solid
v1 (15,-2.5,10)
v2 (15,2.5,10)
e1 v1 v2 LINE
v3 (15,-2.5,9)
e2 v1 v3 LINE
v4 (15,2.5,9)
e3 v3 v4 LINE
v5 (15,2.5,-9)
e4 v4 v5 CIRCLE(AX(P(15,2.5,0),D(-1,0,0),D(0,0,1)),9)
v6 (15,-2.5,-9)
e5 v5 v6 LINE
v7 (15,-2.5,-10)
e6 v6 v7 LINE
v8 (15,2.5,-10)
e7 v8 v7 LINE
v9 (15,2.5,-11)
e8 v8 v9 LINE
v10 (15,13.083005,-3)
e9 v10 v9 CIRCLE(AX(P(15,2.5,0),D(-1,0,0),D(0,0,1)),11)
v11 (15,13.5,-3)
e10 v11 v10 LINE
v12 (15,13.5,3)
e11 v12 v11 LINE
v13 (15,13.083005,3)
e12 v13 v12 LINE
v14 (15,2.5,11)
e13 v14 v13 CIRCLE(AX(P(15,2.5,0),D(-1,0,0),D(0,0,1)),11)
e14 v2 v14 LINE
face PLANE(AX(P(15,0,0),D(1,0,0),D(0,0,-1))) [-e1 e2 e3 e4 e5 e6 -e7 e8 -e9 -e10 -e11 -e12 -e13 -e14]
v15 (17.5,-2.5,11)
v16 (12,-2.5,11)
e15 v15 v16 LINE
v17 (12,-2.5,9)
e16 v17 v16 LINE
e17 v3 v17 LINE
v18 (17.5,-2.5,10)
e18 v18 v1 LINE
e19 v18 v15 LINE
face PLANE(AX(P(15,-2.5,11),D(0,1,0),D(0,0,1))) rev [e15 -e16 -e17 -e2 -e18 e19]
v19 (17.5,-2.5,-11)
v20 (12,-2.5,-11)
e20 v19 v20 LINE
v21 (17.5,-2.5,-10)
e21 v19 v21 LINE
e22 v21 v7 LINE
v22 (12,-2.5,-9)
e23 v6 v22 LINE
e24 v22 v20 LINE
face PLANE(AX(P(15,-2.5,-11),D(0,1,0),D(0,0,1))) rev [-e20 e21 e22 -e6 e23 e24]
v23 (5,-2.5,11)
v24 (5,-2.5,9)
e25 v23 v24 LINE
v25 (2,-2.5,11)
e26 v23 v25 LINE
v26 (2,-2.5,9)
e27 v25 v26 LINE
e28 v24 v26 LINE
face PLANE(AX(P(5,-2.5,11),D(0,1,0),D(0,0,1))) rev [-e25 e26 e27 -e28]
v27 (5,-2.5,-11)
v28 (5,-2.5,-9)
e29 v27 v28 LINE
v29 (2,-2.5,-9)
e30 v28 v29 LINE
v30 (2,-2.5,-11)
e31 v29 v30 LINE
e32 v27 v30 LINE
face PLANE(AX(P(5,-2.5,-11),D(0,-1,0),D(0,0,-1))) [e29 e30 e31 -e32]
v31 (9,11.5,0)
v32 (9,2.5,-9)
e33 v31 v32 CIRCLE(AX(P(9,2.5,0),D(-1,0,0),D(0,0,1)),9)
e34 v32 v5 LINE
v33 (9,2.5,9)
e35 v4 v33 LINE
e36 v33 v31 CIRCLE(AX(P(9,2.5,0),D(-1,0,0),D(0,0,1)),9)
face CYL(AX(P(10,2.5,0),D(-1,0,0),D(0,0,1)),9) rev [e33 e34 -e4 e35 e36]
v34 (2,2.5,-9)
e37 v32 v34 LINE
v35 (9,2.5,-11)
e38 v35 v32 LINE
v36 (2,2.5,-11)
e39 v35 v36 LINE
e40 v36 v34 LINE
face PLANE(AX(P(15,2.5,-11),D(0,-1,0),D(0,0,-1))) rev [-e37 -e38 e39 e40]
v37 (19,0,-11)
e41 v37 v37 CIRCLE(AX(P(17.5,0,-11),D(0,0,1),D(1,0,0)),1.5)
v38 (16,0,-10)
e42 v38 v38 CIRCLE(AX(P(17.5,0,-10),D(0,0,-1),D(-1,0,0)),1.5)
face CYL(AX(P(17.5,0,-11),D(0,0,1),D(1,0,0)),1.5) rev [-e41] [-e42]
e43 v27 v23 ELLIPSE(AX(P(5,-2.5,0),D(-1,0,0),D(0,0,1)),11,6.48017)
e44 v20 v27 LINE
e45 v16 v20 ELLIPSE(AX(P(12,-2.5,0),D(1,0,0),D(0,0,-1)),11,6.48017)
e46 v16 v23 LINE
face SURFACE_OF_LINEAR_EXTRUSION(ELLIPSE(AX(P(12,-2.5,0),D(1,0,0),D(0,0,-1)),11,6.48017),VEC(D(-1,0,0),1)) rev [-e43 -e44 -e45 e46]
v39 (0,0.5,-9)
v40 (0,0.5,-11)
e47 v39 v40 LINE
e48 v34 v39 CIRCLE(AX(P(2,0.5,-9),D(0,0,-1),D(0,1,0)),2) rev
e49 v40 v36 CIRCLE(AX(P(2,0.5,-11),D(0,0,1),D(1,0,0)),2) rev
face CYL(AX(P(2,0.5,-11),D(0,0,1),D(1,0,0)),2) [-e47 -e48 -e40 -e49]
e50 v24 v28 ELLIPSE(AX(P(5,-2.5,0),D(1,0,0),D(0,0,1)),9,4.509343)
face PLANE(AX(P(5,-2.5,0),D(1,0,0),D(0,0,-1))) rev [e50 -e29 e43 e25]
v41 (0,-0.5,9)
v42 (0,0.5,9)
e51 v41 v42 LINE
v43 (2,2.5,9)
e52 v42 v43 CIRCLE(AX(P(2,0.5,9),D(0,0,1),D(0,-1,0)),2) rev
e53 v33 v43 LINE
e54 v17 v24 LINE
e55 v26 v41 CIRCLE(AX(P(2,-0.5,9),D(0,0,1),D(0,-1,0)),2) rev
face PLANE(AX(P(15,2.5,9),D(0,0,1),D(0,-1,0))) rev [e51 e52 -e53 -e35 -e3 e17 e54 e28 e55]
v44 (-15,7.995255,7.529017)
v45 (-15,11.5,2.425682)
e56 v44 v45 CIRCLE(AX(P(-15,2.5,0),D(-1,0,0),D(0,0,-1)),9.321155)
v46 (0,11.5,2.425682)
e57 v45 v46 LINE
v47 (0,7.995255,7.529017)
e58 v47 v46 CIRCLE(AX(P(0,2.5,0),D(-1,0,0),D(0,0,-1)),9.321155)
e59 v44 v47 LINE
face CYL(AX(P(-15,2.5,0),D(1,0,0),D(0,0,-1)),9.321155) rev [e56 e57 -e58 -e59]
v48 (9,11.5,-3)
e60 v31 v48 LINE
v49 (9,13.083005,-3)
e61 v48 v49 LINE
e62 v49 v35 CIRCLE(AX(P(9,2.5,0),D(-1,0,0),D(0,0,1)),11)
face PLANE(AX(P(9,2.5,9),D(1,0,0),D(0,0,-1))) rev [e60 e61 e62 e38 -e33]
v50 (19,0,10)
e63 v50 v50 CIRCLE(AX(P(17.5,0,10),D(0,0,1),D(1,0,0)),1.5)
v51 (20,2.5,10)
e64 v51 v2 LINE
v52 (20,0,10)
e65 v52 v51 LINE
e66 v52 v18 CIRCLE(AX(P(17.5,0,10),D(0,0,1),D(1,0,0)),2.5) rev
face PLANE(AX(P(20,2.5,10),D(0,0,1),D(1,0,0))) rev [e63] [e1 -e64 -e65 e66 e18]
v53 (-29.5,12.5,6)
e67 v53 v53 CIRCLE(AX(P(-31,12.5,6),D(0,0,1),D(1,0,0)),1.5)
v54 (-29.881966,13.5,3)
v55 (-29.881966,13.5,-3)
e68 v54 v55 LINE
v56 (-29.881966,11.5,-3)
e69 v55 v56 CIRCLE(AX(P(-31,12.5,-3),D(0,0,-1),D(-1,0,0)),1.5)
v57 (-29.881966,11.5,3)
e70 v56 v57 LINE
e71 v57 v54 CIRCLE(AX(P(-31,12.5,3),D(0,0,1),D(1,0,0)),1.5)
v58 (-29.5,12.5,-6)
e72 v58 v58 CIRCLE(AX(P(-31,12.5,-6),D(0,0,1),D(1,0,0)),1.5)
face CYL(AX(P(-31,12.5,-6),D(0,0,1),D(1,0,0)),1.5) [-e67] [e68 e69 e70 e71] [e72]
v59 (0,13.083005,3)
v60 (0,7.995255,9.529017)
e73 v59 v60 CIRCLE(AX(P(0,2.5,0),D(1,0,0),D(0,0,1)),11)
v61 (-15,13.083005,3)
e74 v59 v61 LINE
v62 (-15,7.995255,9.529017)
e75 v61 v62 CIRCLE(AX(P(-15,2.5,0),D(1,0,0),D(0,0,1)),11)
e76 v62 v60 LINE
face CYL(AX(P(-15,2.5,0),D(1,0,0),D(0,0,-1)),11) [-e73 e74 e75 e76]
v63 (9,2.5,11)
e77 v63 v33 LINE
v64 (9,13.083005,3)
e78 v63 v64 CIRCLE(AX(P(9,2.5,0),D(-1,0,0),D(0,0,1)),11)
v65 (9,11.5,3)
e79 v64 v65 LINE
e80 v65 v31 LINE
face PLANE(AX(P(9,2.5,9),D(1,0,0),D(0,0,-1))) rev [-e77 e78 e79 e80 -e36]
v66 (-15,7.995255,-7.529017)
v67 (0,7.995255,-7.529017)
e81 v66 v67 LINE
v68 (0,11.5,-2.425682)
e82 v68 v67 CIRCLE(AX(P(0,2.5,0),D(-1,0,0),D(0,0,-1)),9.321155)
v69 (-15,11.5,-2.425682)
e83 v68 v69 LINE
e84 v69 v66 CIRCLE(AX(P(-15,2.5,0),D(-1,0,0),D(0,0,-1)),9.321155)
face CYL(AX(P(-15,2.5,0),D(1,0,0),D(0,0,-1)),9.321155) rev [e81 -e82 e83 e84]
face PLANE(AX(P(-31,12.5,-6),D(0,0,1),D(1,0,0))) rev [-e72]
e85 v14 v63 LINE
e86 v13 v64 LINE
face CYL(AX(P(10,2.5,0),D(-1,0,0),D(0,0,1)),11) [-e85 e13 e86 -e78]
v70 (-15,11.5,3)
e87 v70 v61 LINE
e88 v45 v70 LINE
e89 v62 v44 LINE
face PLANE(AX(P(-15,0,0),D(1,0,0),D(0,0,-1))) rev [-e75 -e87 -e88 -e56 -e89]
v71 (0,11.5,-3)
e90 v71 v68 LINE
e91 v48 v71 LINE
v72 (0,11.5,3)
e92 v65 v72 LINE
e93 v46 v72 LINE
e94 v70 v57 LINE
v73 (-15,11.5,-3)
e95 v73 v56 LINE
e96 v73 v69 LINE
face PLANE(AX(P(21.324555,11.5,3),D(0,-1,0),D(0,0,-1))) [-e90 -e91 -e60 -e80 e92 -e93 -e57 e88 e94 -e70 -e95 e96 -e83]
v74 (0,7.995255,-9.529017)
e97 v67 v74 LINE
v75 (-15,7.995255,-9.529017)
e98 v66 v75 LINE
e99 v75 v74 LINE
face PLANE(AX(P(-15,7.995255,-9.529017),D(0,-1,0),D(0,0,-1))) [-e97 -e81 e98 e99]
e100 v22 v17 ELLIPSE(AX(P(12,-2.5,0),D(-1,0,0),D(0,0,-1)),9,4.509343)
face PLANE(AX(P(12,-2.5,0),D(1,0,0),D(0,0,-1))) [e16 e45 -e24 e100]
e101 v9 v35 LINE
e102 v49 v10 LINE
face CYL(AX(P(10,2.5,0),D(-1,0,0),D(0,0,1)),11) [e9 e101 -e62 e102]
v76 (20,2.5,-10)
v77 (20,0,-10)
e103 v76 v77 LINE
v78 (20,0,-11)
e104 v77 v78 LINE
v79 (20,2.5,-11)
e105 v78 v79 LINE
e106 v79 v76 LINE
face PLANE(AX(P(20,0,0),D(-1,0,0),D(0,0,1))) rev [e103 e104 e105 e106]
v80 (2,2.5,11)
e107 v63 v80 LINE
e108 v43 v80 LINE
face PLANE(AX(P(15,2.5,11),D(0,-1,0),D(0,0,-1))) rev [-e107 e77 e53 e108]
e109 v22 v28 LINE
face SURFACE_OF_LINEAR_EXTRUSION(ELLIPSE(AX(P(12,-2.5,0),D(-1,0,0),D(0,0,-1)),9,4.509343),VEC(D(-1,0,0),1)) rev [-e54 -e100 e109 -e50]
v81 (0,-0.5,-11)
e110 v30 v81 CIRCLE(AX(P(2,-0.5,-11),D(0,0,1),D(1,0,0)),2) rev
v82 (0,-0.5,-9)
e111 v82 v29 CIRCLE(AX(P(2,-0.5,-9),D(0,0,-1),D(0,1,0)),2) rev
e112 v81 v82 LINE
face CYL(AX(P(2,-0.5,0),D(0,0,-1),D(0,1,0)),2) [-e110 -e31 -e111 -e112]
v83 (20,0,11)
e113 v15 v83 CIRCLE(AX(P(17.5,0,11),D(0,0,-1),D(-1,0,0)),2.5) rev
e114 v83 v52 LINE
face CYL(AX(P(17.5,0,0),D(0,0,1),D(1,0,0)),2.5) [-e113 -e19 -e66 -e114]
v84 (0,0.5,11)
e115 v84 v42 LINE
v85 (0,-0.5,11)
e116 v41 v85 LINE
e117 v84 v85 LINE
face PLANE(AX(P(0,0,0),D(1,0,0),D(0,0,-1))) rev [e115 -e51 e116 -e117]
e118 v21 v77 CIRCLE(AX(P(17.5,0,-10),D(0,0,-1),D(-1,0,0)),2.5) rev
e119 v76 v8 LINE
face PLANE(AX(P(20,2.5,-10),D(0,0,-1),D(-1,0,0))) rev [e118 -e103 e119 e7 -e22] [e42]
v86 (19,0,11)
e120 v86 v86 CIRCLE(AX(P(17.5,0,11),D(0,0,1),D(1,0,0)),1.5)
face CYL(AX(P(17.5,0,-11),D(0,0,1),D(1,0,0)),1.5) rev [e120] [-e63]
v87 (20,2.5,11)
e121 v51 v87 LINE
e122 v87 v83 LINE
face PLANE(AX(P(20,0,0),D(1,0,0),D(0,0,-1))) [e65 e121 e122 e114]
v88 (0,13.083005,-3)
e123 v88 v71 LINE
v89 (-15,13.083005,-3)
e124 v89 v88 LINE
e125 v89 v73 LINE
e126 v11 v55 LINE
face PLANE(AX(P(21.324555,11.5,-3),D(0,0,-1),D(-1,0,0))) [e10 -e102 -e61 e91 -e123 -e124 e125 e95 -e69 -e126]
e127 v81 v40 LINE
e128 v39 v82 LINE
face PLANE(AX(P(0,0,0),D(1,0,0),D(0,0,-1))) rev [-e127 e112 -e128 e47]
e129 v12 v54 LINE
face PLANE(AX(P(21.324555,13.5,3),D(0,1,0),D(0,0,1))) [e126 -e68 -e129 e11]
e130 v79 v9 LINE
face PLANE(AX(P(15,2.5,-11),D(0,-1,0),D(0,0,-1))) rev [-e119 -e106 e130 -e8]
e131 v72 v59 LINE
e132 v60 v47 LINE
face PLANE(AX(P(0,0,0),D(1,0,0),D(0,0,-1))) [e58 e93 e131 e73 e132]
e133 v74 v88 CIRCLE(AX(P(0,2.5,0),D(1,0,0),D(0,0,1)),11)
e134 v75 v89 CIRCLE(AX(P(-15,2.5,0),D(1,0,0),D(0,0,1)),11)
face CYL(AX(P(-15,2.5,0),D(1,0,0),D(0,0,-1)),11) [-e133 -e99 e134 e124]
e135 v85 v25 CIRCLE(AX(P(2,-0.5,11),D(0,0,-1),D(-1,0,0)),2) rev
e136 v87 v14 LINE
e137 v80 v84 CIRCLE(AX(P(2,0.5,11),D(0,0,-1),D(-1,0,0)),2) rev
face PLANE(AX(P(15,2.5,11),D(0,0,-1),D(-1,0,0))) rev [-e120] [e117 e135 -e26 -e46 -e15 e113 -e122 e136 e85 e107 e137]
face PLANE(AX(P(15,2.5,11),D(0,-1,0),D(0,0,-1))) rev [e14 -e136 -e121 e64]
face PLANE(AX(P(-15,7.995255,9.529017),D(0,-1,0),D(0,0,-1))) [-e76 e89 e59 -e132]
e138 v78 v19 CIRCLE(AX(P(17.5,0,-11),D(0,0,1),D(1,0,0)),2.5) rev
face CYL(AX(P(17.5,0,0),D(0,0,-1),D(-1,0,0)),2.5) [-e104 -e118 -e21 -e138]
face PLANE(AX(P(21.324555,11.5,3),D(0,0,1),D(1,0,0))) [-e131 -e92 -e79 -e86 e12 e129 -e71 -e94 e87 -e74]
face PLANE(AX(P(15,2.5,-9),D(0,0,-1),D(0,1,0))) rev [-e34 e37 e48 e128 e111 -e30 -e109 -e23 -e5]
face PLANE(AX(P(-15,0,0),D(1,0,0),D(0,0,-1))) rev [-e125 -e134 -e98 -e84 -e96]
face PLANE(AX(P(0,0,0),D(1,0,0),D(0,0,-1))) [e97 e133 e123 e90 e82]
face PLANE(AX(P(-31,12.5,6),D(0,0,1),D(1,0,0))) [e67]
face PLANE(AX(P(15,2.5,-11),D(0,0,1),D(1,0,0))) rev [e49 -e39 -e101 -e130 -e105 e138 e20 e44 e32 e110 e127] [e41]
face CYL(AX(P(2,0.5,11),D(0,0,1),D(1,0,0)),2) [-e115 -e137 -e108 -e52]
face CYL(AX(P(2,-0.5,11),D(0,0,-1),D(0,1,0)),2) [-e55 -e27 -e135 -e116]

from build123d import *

# Parameters (mm, degrees)
SKETCH1_W                = 2
SKETCH1_H                = 5
BOSS_EXTRUDE1_DEPTH      = 15
BOSS_EXTRUDE1_2_DEPTH    = 15
SKETCH2_W                = 1
SKETCH2_H                = 5
BOSS_EXTRUDE2_DEPTH      = 5
CUT_EXTRUDE1_DEPTH       = 30.107559156
CUT_EXTRUDE1_DEPTH_BACK  = 30.107559156
SKETCH3_R                = 1.5
SWEEP1_START             = 9
SWEEP1_DEPTH             = 6
BOSS_EXTRUDE3_DEPTH      = 12
CUT_EXTRUDE2_DEPTH       = 5
FILLET1_R                = 2
BOSS_EXTRUDE6_START      = -6
SKETCH7_W                = 6
SKETCH7_H                = 2
BOSS_EXTRUDE6_DEPTH      = 46
BOSS_EXTRUDE7_DEPTH      = 3
BOSS_EXTRUDE7_DEPTH_BACK = 9
SKETCH8_R                = 1.5
FILLET2_R                = 2.5
BOSS_EXTRUDE10_DEPTH     = 15


# Read off the part's stored shape, not the designer's step: Sweep1
with BuildPart() as part:
    # Sketch1 → Boss-Extrude1 (new body)
    with BuildSketch(Plane(origin=(0, 0, 0), x_dir=(0, 0, -1), z_dir=(1, 0, 0))):
        with Locations((-10, 0)):
            Rectangle(SKETCH1_W, SKETCH1_H)
    extrude(amount=BOSS_EXTRUDE1_DEPTH)



with BuildPart() as body_2:
    # Sketch1 → Boss-Extrude1 2 (new body)
    with BuildSketch(Plane(origin=(0, 0, 0), x_dir=(0, 0, -1), z_dir=(1, 0, 0))):
        with Locations((10, 0)):
            Rectangle(SKETCH1_W, SKETCH1_H)
    extrude(amount=BOSS_EXTRUDE1_2_DEPTH)


with BuildPart() as part_1:
    add(part.part)

    add(body_2.part)  # Boss-Extrude2 merges body 2
    # Sketch2 → Boss-Extrude2 (add)
    with BuildSketch(Plane(origin=(15, 0, 0), x_dir=(0, 0, -1), z_dir=(1, 0, 0))):
        with Locations((10.5, 0)):
            Rectangle(SKETCH2_W, SKETCH2_H)
        with Locations((-10.5, 0)):
            Rectangle(SKETCH2_W, SKETCH2_H)
    extrude(amount=BOSS_EXTRUDE2_DEPTH)

    # Sketch3 → Cut-Extrude1 (cut, two sides: drawn at the far end of the back side and taken through both)
    with BuildSketch(Plane.XY.offset(-10).offset(-CUT_EXTRUDE1_DEPTH_BACK)):
        with Locations((17.5, 0)):
            Circle(SKETCH3_R)
    extrude(amount=CUT_EXTRUDE1_DEPTH + CUT_EXTRUDE1_DEPTH_BACK, mode=Mode.SUBTRACT)

    # Sweep1 outline → Sweep1 (add)
    with BuildSketch(Plane.YZ.offset(SWEEP1_START)):
        with BuildLine():
            ThreePointArc((2.5, -11), (13.5, 0), (2.5, 11))
            Line((2.5, 11), (2.5, 9))
            ThreePointArc((2.5, 9), (11.5, 0), (2.5, -9))
            Line((2.5, -9), (2.5, -11))
        make_face()
    extrude(amount=SWEEP1_DEPTH)

    # Sketch5 → Boss-Extrude3 (add)
    with BuildSketch(Plane(origin=(0, 0, 0), x_dir=(0, 0, -1), z_dir=(1, 0, 0))):
        with BuildLine():
            Line((-9, -2.5), (-11, -2.5))
            add(Edge.make_bspline(
                [(-11, -2.5), (-11, -8.980170496), (0, -8.980170496)],
                knots=[3.141592654, 3.141592654, 3.141592654, 4.71238898, 4.71238898, 4.71238898], degree=2, weights=[1, 0.707106781, 1]))
            Line((0, -8.980170496), (0, -7.009343108))
            add(Edge.make_bspline(
                [(-9, -2.5), (-9, -7.009343108), (0, -7.009343108)],
                knots=[3.141592654, 3.141592654, 3.141592654, 4.71238898, 4.71238898, 4.71238898], degree=2, weights=[1, 0.707106781, 1]))
        make_face()
    boss_extrude3 = extrude(amount=BOSS_EXTRUDE3_DEPTH)

    # Sketch6 → Cut-Extrude2 (cut)
    with BuildSketch(Plane.ZY):
        with BuildLine():
            Line((11, -2.5), (9, -2.5))
            add(Edge.make_bspline(
                [(0, -7.009343108), (9, -7.009343108), (9, -2.5)],
                knots=[4.71238898, 4.71238898, 4.71238898, 6.283185307, 6.283185307, 6.283185307], degree=2, weights=[1, 0.707106781, 1]))
            Line((0, -7.009343108), (0, -8.980170496))
            add(Edge.make_bspline(
                [(0, -8.980170496), (11, -8.980170496), (11, -2.5)],
                knots=[4.71238898, 4.71238898, 4.71238898, 6.283185307, 6.283185307, 6.283185307], degree=2, weights=[1, 0.707106781, 1]))
        make_face()
    cut_extrude2 = extrude(amount=-CUT_EXTRUDE2_DEPTH, mode=Mode.SUBTRACT)

    # Mirror2: Boss-Extrude3, Cut-Extrude2 across plane
    add(boss_extrude3.mirror(Plane(origin=(12, -8.980170496, 0), x_dir=(1, 0, 0), z_dir=(0, 0, 1))))
    add(cut_extrude2.mirror(Plane(origin=(12, -8.980170496, 0), x_dir=(1, 0, 0), z_dir=(0, 0, 1))), mode=Mode.SUBTRACT)

    # Fillet1
    fillet1_edges = [part_1.edges().sort_by_distance(p)[0] for p in [
        (0, -2.5, -10),
        (0, 2.5, -10),
        (0, 2.5, 10),
        (0, -2.5, 10),
    ]]
    fillet(fillet1_edges, radius=FILLET1_R)

    # Sketch7 → Boss-Extrude6 (add)
    with BuildSketch(Plane.ZY.offset(-9).offset(BOSS_EXTRUDE6_START)):
        with Locations((0, 12.5)):
            Rectangle(SKETCH7_W, SKETCH7_H)
    extrude(amount=BOSS_EXTRUDE6_DEPTH)

    # Sketch8 → Boss-Extrude7 (add, two sides: drawn at the far end of the back side and taken through both)
    with BuildSketch(Plane.XY.offset(3).offset(-BOSS_EXTRUDE7_DEPTH_BACK)):
        with Locations((-31, 12.5)):
            Circle(SKETCH8_R)
    extrude(amount=BOSS_EXTRUDE7_DEPTH + BOSS_EXTRUDE7_DEPTH_BACK)

    # Fillet2
    fillet2_edges = [part_1.edges().sort_by_distance(p)[0] for p in [
        (20, -2.5, -10.5),
        (20, -2.5, 10.5),
    ]]
    fillet(fillet2_edges, radius=FILLET2_R)

    # 3DSketch3 → Boss-Extrude10 (add)
    with BuildSketch(Plane(origin=(-15, 7.995255445, 9.529017137), x_dir=(0, 0, -1), z_dir=(1, 0, 0))):
        with BuildLine():
            Line((0, 0), (2, 0))
            ThreePointArc((2, 0), (9.529017137, 3.825899604), (17.058034273, 0))
            Line((17.058034273, 0), (19.058034273, 0))
            ThreePointArc((19.058034273, 0), (15.031388903, 4.029654263), (9.529017137, 5.504744555))
            ThreePointArc((9.529017137, 5.504744555), (4.026645371, 4.029654263), (0, 0))
        make_face()
    extrude(amount=BOSS_EXTRUDE10_DEPTH)


solid = part_1.part
